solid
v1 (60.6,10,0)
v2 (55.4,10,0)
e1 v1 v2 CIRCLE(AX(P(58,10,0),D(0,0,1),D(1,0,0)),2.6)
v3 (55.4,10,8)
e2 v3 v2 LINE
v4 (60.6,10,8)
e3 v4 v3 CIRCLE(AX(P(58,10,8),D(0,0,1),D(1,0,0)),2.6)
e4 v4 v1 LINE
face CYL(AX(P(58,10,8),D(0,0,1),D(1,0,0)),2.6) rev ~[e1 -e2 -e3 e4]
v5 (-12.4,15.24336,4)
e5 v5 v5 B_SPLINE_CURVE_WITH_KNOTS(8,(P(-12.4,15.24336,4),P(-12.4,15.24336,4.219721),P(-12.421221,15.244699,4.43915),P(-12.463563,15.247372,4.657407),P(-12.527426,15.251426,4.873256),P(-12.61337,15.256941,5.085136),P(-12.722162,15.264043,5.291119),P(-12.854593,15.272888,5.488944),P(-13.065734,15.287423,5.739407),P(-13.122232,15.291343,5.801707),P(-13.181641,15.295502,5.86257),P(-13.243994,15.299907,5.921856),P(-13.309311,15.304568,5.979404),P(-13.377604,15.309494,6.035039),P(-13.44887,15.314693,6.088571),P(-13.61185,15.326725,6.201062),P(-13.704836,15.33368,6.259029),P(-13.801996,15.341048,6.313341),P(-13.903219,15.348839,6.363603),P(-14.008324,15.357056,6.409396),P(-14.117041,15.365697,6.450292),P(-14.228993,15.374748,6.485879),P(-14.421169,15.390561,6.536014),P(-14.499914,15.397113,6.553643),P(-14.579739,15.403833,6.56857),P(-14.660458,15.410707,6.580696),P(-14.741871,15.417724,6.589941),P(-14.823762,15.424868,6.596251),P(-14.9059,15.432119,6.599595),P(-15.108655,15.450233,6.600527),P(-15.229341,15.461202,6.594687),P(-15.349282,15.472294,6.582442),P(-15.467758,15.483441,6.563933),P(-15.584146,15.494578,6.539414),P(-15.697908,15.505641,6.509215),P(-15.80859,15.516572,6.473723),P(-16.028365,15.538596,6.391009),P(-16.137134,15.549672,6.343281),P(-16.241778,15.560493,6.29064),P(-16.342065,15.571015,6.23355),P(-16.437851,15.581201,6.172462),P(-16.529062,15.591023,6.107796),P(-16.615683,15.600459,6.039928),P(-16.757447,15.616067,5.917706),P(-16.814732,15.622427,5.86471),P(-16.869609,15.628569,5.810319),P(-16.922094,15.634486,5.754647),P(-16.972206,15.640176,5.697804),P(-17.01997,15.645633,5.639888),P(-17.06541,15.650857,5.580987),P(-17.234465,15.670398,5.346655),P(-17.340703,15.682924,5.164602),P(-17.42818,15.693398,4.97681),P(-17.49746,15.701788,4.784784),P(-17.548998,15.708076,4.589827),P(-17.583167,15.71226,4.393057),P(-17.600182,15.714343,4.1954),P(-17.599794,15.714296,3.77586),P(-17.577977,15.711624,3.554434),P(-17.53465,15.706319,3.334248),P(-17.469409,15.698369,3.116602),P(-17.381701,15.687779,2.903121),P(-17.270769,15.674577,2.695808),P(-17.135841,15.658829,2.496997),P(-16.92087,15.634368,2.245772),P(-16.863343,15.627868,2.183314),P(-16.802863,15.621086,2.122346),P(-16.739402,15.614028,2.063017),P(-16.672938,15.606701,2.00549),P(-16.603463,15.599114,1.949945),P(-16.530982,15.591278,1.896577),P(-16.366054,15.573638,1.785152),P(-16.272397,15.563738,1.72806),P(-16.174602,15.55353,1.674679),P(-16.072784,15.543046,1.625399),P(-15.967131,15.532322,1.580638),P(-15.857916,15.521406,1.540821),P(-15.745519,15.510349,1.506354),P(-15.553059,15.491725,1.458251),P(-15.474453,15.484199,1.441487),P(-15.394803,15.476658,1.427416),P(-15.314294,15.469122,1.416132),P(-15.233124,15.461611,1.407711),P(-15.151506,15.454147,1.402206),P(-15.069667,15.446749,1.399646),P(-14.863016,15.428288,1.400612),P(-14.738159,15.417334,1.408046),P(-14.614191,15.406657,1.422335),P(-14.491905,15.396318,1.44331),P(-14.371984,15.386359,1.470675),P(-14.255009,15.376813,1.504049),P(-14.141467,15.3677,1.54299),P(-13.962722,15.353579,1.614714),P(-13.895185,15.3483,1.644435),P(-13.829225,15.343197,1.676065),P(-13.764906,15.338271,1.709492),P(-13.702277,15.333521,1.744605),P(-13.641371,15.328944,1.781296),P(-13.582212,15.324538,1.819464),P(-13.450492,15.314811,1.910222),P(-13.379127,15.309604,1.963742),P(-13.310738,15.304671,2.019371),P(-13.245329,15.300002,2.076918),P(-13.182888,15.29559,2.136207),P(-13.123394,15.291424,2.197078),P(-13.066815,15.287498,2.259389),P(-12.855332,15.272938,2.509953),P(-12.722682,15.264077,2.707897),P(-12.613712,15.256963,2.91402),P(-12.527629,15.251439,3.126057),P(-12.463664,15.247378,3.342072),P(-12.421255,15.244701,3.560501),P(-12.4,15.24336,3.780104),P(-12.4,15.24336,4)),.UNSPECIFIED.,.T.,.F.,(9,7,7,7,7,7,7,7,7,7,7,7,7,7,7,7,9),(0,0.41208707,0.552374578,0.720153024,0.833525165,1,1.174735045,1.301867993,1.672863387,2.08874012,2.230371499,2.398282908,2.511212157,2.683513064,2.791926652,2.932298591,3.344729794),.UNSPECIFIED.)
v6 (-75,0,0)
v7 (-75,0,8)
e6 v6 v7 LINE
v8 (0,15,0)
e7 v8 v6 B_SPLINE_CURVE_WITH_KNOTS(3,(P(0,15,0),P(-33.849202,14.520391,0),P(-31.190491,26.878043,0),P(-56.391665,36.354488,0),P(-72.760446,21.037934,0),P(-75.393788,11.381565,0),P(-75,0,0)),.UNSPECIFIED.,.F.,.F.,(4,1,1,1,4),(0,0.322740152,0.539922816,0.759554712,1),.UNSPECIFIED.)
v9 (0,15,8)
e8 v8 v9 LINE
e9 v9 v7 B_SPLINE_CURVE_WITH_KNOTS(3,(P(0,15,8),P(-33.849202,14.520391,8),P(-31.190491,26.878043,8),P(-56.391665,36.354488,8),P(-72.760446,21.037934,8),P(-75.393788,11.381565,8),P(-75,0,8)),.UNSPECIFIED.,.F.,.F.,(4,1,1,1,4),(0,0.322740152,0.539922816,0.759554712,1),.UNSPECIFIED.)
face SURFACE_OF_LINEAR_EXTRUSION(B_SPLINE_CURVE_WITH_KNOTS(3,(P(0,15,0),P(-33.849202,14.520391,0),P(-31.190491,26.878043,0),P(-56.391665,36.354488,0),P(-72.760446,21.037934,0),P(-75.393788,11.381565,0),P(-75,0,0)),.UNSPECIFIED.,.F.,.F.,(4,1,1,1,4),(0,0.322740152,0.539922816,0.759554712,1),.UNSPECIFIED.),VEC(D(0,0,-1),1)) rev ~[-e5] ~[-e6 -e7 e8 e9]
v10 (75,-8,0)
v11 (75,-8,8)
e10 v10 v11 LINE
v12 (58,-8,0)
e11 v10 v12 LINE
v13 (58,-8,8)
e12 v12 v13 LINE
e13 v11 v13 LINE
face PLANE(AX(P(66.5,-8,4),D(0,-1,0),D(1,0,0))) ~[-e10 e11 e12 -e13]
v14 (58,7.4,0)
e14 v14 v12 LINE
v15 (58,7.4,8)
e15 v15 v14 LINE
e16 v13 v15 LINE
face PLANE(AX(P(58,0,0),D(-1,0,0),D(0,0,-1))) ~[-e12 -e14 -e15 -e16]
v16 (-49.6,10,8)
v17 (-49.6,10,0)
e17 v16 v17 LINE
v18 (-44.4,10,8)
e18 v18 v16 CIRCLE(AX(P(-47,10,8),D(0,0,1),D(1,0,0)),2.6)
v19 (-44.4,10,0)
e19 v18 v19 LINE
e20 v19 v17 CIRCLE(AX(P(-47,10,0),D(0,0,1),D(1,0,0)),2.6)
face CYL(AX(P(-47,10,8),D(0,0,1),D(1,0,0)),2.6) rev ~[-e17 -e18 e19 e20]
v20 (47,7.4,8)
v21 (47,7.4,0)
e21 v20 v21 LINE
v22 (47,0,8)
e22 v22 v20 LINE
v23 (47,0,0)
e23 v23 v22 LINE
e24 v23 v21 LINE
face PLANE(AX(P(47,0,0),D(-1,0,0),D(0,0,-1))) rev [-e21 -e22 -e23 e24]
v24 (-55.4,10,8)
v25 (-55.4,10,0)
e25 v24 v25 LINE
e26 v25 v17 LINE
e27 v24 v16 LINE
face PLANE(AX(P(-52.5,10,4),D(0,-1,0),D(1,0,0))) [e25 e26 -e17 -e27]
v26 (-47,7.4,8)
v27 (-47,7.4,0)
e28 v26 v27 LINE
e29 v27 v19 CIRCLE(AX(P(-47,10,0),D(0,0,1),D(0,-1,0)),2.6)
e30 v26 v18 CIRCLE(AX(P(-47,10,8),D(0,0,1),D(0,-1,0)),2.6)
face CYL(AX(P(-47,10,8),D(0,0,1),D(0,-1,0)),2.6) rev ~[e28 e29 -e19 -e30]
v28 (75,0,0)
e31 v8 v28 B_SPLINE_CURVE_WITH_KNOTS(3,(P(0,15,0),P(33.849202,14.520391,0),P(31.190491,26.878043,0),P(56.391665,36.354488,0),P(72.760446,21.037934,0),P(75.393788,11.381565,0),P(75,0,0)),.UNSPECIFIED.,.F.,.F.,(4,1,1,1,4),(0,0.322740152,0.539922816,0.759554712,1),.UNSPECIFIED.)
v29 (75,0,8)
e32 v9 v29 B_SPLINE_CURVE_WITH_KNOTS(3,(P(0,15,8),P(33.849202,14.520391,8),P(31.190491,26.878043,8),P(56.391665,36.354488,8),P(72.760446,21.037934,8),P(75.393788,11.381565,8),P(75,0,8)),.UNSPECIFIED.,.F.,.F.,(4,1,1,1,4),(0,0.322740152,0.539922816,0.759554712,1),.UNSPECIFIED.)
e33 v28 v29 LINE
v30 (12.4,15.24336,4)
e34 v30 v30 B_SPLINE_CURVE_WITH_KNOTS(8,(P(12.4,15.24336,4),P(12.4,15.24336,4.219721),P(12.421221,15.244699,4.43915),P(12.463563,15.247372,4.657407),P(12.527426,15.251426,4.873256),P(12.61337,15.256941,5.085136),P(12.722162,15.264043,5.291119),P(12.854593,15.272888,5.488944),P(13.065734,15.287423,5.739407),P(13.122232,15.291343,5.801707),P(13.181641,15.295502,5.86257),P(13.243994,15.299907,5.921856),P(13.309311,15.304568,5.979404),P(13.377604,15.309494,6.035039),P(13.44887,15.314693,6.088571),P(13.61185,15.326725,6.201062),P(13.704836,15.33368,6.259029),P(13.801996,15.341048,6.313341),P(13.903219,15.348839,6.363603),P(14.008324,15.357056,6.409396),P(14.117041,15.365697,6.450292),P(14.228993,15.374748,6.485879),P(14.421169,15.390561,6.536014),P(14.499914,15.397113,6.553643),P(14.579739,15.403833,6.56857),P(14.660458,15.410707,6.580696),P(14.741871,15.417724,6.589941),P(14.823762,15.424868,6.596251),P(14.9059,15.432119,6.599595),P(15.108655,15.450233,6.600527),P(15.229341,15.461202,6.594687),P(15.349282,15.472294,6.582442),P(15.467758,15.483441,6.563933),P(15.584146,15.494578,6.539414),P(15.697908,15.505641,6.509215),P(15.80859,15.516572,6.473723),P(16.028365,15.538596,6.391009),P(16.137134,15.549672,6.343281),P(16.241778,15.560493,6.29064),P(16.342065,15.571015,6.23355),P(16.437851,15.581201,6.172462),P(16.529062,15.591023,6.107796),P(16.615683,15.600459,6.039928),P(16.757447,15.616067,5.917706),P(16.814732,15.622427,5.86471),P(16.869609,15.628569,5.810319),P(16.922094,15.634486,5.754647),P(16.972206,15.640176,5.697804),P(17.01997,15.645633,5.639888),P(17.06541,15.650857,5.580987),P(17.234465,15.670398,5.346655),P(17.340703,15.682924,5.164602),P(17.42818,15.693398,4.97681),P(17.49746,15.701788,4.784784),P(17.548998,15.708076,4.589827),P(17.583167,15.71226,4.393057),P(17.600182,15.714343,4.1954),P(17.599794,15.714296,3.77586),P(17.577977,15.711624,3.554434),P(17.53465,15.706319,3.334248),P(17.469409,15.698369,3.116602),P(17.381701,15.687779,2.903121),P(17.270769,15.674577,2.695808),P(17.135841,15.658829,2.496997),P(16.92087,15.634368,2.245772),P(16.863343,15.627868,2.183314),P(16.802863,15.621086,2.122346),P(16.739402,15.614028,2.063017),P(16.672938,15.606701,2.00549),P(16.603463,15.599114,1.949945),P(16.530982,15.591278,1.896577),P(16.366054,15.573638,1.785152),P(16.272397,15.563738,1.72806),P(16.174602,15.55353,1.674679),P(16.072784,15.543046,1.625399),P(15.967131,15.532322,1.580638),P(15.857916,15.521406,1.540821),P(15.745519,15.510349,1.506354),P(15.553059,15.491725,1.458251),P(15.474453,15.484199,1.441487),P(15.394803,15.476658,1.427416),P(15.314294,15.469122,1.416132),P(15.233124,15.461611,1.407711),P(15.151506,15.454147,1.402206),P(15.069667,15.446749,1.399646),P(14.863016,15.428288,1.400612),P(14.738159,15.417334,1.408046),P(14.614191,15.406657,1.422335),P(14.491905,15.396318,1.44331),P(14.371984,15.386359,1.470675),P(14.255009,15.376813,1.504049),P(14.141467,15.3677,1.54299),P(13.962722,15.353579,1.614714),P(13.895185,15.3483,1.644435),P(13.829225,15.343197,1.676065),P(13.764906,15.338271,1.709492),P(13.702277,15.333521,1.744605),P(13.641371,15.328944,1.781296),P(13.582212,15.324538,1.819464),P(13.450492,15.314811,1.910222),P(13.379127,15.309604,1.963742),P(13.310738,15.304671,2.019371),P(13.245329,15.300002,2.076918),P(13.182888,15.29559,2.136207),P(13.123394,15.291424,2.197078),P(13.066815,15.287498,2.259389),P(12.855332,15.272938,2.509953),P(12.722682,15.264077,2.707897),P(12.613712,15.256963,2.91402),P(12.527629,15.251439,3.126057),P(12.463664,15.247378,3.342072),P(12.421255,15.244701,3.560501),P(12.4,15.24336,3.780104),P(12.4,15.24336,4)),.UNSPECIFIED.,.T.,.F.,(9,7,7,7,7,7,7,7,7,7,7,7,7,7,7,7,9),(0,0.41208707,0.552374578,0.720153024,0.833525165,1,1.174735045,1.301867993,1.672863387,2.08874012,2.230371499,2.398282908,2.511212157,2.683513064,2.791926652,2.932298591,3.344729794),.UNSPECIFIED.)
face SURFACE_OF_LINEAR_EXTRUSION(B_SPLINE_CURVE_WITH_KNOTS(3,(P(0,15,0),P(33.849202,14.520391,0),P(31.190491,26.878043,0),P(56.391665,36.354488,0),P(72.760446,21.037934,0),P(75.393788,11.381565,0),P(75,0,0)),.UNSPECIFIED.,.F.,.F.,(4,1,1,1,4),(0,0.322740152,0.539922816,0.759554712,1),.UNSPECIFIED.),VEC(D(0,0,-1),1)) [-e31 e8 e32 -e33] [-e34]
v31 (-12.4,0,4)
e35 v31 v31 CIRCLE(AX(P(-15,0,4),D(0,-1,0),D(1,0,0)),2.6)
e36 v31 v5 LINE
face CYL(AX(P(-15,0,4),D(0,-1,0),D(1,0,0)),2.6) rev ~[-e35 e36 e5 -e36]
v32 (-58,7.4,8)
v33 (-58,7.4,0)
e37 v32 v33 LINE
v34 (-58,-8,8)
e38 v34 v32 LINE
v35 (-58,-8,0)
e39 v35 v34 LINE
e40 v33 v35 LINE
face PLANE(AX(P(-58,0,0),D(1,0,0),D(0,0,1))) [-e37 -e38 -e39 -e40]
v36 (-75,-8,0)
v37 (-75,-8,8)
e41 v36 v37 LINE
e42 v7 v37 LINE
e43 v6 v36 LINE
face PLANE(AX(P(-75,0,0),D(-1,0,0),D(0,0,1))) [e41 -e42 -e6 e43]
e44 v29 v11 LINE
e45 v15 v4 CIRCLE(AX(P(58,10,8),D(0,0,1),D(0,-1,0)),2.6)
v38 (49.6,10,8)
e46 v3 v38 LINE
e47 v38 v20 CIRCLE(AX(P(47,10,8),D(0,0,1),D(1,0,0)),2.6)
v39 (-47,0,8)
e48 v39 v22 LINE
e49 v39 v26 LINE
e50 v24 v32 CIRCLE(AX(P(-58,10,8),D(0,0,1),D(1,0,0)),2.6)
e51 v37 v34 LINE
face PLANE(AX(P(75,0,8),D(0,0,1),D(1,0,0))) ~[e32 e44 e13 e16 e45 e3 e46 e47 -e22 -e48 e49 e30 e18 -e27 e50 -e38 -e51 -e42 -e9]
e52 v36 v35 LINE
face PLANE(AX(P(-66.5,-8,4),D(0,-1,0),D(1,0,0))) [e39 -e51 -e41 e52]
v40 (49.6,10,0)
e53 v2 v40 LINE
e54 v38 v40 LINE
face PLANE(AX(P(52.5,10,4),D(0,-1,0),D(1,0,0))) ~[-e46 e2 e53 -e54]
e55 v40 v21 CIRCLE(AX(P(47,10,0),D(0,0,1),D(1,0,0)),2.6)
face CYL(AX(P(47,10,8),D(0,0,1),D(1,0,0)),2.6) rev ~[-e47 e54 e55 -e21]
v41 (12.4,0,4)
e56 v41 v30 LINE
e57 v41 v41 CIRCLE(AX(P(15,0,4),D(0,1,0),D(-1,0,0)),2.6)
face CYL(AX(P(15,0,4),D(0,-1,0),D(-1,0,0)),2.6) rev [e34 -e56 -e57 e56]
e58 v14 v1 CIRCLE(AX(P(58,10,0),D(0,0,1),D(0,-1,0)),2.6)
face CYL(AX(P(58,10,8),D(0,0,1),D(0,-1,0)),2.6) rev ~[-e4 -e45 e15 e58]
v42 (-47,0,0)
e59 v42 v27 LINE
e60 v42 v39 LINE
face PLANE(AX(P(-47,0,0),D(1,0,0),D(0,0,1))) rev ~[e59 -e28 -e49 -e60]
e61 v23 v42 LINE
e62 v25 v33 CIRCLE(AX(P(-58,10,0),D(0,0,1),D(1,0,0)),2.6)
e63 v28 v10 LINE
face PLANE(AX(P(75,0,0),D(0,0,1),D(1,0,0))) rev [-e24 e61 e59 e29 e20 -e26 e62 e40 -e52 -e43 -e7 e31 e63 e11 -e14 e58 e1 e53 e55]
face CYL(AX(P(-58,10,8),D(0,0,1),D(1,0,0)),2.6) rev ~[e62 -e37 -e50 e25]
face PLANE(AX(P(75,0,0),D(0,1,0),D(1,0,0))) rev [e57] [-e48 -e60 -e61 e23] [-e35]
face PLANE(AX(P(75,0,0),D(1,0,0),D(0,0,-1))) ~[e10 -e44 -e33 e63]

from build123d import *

# Parameters (mm, degrees)
F1_DEPTH  = 8
F2_R      = 2.6
F3_DEPTH  = 32.7754338425
F4_W      = 17
F4_H      = 8
F5_DEPTH  = 8
F6_W      = 11
F6_H      = 8
F7_DEPTH  = 10
F10_DEPTH = 8.0010001


# Not quite as in the source:
# - a feature names something its author has since deleted; it is built from what else it names


with BuildPart() as f1:
    # F0 (on Top) → F1 (new body)
    with BuildSketch(Plane.XY):
        with BuildLine():
            Line((-75, 0), (0, 0))
            Line((0, 0), (0, 15))
            add(Edge.make_bspline(
                [(0, 15), (-33.8492020965, 14.5203908905), (-31.1904909634, 26.878043416), (-56.3916650053, 36.3544882745), (-72.7604456377, 21.0379339388), (-75.3937876263, 11.3815652157), (-75, 0)],
                knots=[0, 0, 0, 0, 0.3227401515, 0.539922816, 0.7595547121, 1, 1, 1, 1], degree=3))
        make_face()
    extrude(amount=F1_DEPTH)

    # F2 (on face) → F3 (cut, through all)
    with BuildSketch(Plane.XZ):
        with Locations((-15, 4)):
            Circle(F2_R)
        with Locations((15, 4)):
            Circle(F2_R)
    extrude(amount=-F3_DEPTH, mode=Mode.SUBTRACT)

    # F4 (on face) → F5 (join)
    with BuildSketch(Plane.XZ):
        with Locations((-66.5, 4)):
            Rectangle(F4_W, F4_H)
    extrude(amount=F5_DEPTH)

    # F6 (on face) → F7 (cut)
    with BuildSketch(Plane.XZ):
        with Locations((-52.5, 4)):
            Rectangle(F6_W, F6_H)
    extrude(amount=-F7_DEPTH, mode=Mode.SUBTRACT)

    # F8: F1 across face


with BuildPart() as f1_1:
    add(f1.part)
    add(f1.part.mirror(Plane(origin=(0, 7.5, 4), x_dir=(0, 1, 0), z_dir=(1, 0, 0))))

    # F9 (on face) → F10 (cut, through all)
    with BuildSketch(Plane.XY.offset(8)):
        with BuildLine():
            ThreePointArc((58, 7.4), (59.8384776311, 8.1615223689), (60.6, 10))
            ThreePointArc((60.6, 10), (58, 12.6), (55.4, 10))
            Line((55.4, 10), (58, 10))
            Line((58, 10), (58, 7.4))
        make_face()
        with BuildLine():
            Line((47, 10), (49.6, 10))
            ThreePointArc((49.6, 10), (45.1615223689, 11.8384776311), (47, 7.4))
            Line((47, 7.4), (47, 10))
        make_face()
        with BuildLine():
            Line((-47, 10), (-47, 7.4))
            ThreePointArc((-47, 7.4), (-45.1615223689, 8.1615223689), (-44.4, 10))
            ThreePointArc((-44.4, 10), (-47, 12.6), (-49.6, 10))
            Line((-49.6, 10), (-47, 10))
        make_face()
        with BuildLine():
            Line((-58, 10), (-55.4, 10))
            ThreePointArc((-55.4, 10), (-59.8384776311, 11.8384776311), (-58, 7.4))
            Line((-58, 7.4), (-58, 10))
        make_face()
    extrude(amount=-F10_DEPTH, mode=Mode.SUBTRACT)


solid = f1_1.part
